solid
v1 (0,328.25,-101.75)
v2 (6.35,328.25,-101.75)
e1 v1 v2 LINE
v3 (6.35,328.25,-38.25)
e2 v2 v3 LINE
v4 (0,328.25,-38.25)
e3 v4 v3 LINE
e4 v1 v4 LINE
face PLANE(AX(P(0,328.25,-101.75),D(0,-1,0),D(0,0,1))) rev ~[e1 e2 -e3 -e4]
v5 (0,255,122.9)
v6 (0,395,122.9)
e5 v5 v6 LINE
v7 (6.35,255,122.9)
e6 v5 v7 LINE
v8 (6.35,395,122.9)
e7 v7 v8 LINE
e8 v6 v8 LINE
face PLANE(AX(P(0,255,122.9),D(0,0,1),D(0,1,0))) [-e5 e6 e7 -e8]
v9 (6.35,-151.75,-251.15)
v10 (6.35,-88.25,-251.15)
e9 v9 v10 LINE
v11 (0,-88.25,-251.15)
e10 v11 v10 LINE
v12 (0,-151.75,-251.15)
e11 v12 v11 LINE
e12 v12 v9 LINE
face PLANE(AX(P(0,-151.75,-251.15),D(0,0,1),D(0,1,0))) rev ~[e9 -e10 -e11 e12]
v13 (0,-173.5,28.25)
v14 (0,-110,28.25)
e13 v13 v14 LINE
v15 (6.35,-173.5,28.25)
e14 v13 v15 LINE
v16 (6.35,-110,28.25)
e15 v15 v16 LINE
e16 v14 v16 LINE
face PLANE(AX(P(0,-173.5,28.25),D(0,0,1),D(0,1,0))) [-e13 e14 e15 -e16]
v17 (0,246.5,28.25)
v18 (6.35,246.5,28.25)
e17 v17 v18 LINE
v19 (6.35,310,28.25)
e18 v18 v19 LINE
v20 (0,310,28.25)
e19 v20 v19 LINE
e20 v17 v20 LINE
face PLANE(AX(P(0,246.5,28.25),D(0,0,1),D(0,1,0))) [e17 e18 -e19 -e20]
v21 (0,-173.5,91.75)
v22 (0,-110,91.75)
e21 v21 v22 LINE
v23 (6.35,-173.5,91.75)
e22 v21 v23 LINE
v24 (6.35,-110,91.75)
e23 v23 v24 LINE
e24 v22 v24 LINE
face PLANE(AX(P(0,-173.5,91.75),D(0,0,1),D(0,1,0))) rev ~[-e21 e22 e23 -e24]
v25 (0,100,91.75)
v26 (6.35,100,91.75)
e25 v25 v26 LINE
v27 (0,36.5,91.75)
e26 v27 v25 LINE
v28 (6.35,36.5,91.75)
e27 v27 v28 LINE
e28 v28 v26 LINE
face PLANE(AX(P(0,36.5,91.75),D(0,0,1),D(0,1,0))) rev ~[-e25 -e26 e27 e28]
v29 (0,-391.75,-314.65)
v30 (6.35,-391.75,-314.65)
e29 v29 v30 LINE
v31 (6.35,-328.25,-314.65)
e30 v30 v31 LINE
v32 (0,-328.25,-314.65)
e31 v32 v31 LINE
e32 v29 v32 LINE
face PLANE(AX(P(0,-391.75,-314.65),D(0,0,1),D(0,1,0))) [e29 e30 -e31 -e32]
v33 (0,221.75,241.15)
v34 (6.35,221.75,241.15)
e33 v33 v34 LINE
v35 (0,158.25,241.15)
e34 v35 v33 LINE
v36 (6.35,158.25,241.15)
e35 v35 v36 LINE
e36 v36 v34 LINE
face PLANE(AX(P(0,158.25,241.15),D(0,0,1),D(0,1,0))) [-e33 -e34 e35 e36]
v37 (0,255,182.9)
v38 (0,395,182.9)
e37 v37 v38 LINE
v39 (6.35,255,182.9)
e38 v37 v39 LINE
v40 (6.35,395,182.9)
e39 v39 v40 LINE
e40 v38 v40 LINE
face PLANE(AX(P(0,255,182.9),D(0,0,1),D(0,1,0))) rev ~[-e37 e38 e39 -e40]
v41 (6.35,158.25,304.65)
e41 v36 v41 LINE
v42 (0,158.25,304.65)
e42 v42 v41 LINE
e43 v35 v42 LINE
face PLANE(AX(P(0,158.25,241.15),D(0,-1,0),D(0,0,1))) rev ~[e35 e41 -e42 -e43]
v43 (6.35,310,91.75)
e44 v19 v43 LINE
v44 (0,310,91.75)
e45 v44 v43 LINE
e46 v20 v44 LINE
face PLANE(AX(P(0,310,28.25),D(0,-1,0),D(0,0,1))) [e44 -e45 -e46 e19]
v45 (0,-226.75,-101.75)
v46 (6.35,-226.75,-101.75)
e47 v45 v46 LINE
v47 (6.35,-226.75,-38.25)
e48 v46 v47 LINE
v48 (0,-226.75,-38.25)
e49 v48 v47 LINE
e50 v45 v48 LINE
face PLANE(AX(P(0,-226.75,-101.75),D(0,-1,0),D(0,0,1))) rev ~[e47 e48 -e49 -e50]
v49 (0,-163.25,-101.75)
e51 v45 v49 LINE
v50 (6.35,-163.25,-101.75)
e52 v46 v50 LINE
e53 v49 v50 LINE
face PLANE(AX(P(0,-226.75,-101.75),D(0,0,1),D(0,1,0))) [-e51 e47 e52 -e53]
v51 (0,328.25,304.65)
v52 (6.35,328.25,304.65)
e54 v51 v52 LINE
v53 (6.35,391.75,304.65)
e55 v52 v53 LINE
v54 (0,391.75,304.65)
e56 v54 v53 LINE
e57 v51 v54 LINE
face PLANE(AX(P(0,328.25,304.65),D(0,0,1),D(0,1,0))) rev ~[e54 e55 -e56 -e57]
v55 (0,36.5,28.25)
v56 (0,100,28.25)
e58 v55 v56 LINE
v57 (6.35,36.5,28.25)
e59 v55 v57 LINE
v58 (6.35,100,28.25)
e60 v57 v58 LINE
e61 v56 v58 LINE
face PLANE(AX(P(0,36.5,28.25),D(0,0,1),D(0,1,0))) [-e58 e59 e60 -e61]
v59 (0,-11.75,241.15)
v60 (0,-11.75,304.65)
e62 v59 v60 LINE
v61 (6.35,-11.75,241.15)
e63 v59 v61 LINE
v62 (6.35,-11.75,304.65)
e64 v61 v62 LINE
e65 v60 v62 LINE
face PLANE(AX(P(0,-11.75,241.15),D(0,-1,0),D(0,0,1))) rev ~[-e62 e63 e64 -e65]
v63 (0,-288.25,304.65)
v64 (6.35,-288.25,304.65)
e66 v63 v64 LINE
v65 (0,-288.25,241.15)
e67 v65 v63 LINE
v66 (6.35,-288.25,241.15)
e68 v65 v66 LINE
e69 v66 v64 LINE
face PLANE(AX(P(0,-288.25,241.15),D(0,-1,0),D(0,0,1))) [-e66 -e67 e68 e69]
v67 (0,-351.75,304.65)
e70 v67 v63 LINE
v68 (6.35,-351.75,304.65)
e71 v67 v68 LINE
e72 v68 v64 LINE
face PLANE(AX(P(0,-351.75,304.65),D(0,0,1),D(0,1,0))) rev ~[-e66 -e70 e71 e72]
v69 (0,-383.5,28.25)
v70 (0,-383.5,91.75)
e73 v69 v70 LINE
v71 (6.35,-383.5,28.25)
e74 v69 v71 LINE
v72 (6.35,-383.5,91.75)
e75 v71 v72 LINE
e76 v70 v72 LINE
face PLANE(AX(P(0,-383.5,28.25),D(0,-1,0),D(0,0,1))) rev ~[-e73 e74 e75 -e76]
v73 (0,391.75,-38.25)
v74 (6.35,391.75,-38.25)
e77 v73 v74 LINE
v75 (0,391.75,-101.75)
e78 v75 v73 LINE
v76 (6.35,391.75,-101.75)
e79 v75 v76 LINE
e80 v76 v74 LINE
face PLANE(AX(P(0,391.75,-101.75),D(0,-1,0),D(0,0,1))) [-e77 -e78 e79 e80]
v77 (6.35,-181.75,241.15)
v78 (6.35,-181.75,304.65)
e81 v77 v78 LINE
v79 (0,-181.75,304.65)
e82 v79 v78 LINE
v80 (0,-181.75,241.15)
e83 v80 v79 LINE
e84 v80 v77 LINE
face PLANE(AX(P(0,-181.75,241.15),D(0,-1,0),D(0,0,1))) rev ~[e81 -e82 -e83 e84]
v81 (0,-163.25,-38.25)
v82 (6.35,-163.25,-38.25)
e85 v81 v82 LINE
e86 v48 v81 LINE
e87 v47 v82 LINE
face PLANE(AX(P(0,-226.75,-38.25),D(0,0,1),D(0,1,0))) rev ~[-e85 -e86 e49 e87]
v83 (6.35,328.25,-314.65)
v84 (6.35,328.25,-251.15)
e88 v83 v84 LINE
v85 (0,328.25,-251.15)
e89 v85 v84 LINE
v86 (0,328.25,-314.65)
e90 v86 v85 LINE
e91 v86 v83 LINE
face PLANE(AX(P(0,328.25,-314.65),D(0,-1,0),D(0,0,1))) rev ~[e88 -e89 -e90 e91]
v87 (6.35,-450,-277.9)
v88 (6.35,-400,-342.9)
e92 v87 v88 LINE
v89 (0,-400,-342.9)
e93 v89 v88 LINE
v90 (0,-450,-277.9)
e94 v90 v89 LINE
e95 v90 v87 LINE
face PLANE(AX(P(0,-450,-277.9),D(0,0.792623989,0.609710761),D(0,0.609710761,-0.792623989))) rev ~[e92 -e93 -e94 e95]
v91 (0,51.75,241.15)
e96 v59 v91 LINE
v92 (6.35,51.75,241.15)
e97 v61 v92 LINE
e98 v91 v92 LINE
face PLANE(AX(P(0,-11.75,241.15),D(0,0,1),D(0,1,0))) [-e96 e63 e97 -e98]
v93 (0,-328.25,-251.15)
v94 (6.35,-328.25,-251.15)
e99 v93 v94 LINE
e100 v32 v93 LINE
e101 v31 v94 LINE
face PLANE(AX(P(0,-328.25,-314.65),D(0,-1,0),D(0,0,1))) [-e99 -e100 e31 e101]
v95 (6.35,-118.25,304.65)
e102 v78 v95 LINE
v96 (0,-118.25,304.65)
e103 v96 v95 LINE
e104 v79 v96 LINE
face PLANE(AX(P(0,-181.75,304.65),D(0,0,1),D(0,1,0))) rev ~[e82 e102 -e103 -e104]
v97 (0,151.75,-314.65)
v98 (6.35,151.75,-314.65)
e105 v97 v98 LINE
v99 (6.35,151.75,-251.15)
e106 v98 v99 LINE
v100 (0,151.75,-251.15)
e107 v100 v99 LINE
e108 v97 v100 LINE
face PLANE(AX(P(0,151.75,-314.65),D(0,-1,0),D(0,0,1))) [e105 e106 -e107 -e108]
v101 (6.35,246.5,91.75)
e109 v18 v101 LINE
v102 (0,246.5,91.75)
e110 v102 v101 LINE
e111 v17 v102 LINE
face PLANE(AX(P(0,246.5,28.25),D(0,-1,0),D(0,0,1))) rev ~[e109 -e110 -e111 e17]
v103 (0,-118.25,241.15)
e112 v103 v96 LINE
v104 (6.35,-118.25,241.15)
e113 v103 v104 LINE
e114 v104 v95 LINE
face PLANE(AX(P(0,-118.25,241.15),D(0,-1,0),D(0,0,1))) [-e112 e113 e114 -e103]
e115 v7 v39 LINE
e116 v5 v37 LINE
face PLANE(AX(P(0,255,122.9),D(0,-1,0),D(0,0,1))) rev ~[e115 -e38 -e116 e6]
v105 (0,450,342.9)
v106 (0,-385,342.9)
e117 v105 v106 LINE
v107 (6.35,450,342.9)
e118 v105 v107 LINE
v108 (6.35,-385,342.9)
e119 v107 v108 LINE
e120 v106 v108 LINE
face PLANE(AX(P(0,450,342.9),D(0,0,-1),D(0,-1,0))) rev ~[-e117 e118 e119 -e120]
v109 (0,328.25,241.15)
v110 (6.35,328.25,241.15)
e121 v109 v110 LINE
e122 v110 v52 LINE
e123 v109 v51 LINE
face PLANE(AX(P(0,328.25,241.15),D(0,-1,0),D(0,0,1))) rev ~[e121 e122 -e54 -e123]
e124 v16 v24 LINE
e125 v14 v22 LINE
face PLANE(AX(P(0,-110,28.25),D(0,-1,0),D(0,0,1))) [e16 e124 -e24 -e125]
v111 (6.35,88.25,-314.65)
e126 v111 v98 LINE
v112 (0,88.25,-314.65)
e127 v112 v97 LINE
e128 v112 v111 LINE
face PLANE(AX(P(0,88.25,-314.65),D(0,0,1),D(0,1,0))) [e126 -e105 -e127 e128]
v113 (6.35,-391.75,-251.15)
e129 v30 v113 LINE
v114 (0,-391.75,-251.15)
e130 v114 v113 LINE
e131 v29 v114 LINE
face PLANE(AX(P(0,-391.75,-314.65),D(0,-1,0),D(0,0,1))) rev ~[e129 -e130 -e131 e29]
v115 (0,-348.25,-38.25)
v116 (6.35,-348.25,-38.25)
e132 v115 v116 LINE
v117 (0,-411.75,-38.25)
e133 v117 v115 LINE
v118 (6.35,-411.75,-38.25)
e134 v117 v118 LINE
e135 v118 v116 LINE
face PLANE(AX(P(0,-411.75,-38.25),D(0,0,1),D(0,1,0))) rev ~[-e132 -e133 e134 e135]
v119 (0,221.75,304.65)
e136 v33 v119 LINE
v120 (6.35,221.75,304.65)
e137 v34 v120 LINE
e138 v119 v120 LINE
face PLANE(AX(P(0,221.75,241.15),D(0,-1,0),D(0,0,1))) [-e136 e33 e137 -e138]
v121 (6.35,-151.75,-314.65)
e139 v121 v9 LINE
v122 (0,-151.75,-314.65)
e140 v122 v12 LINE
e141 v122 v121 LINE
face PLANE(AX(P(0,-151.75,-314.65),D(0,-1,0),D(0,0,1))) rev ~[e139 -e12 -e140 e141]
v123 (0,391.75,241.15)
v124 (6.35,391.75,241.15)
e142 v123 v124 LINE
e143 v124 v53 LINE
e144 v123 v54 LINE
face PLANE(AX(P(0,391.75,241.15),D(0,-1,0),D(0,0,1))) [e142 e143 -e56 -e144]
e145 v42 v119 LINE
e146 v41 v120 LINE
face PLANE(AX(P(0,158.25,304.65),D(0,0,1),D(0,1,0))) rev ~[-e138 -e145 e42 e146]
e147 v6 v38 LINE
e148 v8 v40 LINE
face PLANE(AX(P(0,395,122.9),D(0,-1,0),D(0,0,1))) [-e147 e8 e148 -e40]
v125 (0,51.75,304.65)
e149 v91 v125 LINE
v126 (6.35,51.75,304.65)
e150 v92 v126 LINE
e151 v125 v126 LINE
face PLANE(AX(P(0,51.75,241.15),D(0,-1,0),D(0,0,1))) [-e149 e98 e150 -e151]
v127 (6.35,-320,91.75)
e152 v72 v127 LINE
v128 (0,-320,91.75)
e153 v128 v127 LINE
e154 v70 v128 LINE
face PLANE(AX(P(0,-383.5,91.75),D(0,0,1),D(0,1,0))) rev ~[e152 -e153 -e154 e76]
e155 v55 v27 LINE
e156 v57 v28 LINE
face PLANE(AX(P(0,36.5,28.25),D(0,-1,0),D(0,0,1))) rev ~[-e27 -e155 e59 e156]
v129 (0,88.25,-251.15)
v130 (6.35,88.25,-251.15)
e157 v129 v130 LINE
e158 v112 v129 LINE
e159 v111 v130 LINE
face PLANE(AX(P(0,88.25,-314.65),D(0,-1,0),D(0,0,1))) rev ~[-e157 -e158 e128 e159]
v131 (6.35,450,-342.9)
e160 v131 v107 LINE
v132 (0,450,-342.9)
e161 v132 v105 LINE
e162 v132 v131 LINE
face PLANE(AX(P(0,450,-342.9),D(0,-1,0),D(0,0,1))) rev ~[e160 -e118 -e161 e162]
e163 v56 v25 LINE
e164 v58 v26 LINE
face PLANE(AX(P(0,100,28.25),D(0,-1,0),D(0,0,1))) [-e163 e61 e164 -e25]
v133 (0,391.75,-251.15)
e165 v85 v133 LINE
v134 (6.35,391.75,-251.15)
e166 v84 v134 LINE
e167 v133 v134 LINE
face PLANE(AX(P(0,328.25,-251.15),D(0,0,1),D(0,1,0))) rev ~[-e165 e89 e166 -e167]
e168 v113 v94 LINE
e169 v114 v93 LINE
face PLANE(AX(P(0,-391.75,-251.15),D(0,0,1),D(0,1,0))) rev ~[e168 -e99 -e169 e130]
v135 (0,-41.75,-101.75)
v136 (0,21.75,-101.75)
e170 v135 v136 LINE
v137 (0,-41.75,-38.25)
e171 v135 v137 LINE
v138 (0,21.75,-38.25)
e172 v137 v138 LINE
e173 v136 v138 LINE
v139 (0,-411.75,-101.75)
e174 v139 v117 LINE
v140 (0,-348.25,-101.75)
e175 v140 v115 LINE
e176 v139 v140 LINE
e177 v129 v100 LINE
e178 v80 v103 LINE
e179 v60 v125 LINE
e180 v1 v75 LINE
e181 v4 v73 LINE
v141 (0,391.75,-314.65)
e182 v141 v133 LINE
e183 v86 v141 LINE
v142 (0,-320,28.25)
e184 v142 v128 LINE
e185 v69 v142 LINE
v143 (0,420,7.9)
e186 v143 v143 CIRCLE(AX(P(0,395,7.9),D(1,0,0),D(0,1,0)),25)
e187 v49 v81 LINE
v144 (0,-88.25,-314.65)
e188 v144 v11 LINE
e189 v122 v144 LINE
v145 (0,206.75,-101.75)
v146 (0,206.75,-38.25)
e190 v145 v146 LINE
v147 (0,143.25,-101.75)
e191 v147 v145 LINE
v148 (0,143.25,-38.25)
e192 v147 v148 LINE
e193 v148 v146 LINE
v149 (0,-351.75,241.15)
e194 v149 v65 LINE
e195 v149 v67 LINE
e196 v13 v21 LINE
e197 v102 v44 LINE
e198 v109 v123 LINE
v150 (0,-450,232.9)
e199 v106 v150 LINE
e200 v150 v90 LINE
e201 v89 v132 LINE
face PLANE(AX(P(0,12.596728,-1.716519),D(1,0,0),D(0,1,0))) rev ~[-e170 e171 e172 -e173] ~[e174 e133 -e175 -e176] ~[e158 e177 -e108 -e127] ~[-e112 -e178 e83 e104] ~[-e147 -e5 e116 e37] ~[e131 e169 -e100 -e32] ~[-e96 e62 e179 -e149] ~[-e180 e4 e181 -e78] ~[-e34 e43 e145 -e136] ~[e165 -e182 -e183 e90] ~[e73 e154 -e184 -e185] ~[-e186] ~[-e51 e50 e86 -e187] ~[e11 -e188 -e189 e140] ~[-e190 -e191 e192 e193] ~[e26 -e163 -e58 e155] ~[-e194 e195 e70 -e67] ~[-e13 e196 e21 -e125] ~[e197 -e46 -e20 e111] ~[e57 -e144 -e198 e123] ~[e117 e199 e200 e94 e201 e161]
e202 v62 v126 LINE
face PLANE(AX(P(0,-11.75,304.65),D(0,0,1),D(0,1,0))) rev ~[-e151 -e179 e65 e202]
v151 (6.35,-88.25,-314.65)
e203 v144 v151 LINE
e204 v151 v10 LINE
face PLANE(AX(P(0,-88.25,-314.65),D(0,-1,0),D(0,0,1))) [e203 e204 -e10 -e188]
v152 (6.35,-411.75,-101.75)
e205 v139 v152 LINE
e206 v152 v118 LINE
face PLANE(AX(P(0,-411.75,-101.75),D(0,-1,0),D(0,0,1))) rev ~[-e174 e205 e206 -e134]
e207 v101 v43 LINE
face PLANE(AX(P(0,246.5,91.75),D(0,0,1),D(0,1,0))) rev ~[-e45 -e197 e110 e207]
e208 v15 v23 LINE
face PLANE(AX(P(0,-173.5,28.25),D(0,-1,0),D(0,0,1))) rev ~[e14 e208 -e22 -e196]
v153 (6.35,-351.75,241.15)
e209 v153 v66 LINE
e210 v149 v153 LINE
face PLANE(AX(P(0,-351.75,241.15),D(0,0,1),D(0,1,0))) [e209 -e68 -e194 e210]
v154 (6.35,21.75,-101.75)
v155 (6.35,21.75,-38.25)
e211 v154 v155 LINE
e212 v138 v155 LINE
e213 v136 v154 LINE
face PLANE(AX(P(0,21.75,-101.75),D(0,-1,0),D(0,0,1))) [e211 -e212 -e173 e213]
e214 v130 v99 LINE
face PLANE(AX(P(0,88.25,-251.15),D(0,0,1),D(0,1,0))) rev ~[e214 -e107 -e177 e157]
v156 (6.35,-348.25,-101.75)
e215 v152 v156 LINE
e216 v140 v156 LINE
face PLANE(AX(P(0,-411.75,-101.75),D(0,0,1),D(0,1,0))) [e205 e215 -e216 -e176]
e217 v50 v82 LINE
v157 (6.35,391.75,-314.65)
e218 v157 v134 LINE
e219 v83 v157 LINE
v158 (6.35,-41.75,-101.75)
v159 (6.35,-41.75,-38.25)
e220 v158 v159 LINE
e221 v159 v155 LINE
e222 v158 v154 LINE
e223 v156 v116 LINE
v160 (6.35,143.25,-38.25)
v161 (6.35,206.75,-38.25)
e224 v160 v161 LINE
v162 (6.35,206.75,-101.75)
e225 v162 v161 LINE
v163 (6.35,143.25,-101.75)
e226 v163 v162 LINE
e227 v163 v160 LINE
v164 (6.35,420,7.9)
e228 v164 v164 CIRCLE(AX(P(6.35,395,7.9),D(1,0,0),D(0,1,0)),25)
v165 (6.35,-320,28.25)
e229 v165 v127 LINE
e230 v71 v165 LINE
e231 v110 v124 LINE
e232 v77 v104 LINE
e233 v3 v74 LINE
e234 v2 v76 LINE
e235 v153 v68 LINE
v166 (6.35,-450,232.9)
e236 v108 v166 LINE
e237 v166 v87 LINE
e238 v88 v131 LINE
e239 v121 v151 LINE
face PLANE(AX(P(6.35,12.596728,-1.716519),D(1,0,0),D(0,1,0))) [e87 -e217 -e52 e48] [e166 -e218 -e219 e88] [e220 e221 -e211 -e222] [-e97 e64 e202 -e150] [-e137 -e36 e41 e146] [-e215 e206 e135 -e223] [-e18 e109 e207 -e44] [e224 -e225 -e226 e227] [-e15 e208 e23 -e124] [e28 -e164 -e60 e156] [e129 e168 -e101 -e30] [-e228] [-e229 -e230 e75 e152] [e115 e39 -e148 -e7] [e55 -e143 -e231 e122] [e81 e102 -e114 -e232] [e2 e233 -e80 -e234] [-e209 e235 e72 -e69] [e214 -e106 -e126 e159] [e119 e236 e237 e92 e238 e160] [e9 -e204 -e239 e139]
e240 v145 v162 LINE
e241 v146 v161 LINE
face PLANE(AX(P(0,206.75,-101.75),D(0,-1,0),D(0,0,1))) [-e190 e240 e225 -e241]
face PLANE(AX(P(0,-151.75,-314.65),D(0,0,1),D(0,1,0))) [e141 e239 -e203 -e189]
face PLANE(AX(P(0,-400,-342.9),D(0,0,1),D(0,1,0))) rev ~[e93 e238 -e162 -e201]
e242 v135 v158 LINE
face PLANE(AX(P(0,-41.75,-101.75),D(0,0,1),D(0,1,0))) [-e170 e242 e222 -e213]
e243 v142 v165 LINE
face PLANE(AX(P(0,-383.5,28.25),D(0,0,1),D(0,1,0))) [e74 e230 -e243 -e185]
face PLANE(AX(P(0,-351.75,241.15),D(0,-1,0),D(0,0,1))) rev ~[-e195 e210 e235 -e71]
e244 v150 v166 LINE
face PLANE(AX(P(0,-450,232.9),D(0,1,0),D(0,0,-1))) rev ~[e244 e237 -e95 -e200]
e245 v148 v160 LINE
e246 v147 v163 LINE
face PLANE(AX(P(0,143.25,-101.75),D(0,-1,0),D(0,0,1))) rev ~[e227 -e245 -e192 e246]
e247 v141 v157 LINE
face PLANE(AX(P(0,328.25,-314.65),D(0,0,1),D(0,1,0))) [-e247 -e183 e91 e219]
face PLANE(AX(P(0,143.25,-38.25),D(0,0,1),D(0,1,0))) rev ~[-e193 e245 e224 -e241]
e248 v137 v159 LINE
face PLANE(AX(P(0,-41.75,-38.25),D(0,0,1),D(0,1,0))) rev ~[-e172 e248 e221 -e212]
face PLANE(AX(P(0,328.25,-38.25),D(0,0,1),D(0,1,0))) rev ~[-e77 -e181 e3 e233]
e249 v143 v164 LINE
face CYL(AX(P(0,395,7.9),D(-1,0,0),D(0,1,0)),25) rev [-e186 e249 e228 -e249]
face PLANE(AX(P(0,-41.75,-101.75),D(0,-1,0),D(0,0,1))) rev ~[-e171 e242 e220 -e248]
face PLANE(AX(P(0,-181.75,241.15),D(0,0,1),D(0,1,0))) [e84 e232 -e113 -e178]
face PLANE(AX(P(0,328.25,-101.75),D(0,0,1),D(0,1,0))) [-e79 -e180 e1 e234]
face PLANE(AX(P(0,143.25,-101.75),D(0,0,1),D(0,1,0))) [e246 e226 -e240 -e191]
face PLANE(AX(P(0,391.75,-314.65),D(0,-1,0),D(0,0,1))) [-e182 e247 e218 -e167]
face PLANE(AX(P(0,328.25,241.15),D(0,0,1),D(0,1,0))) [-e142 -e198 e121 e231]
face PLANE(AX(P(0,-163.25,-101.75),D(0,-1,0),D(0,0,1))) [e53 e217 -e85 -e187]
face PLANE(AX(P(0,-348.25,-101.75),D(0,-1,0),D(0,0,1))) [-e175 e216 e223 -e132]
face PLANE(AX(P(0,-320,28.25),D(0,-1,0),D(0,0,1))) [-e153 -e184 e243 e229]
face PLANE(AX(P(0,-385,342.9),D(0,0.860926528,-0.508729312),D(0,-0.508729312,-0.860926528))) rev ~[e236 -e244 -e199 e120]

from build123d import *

# Parameters (mm, degrees)
F0_W     = 63.5
F0_H     = 63.5
F0_R     = 25
F0_W_2   = 140
F0_H_2   = 60
F1_DEPTH = 6.35


# Not quite as in the source:
# - a length typed as a fraction of an inch, garbled in the dataset ("3 / 203.2 mm" for 3/8 in), is restored


with BuildPart() as f1:
    # F0 (on Right) → F1 (new body)
    with BuildSketch(Plane.YZ):
        Polygon((-400, -342.9), (450, -342.9), (450, 342.9), (-385, 342.9), (-450, 232.9), (-450, -277.9), align=None)
        with Locations((-360, -282.9)):
            Rectangle(F0_W, F0_H, mode=Mode.SUBTRACT)
        with Locations((-120, -282.9)):
            Rectangle(F0_W, F0_H, mode=Mode.SUBTRACT)
        with Locations((-380, -70)):
            Rectangle(F0_W, F0_H, mode=Mode.SUBTRACT)
        with Locations((-195, -70)):
            Rectangle(F0_W, F0_H, mode=Mode.SUBTRACT)
        with Locations((-10, -70)):
            Rectangle(F0_W, F0_H, mode=Mode.SUBTRACT)
        with Locations((120, -282.9)):
            Rectangle(F0_W, F0_H, mode=Mode.SUBTRACT)
        with Locations((360, -282.9)):
            Rectangle(F0_W, F0_H, mode=Mode.SUBTRACT)
        with Locations((175, -70)):
            Rectangle(F0_W, F0_H, mode=Mode.SUBTRACT)
        with Locations((360, -70)):
            Rectangle(F0_W, F0_H, mode=Mode.SUBTRACT)
        with Locations((-351.75, 60)):
            Rectangle(F0_W, F0_H, mode=Mode.SUBTRACT)
        with Locations((-141.75, 60)):
            Rectangle(F0_W, F0_H, mode=Mode.SUBTRACT)
        with Locations((-320, 272.9)):
            Rectangle(F0_W, F0_H, mode=Mode.SUBTRACT)
        with Locations((-150, 272.9)):
            Rectangle(F0_W, F0_H, mode=Mode.SUBTRACT)
        with Locations((68.25, 60)):
            Rectangle(F0_W, F0_H, mode=Mode.SUBTRACT)
        with Locations((278.25, 60)):
            Rectangle(F0_W, F0_H, mode=Mode.SUBTRACT)
        with Locations((395, 7.9)):
            Circle(F0_R, mode=Mode.SUBTRACT)
        with Locations((325, 152.9)):
            Rectangle(F0_W_2, F0_H_2, mode=Mode.SUBTRACT)
        with Locations((20, 272.9)):
            Rectangle(F0_W, F0_H, mode=Mode.SUBTRACT)
        with Locations((190, 272.9)):
            Rectangle(F0_W, F0_H, mode=Mode.SUBTRACT)
        with Locations((360, 272.9)):
            Rectangle(F0_W, F0_H, mode=Mode.SUBTRACT)
    extrude(amount=F1_DEPTH)


solid = f1.part
